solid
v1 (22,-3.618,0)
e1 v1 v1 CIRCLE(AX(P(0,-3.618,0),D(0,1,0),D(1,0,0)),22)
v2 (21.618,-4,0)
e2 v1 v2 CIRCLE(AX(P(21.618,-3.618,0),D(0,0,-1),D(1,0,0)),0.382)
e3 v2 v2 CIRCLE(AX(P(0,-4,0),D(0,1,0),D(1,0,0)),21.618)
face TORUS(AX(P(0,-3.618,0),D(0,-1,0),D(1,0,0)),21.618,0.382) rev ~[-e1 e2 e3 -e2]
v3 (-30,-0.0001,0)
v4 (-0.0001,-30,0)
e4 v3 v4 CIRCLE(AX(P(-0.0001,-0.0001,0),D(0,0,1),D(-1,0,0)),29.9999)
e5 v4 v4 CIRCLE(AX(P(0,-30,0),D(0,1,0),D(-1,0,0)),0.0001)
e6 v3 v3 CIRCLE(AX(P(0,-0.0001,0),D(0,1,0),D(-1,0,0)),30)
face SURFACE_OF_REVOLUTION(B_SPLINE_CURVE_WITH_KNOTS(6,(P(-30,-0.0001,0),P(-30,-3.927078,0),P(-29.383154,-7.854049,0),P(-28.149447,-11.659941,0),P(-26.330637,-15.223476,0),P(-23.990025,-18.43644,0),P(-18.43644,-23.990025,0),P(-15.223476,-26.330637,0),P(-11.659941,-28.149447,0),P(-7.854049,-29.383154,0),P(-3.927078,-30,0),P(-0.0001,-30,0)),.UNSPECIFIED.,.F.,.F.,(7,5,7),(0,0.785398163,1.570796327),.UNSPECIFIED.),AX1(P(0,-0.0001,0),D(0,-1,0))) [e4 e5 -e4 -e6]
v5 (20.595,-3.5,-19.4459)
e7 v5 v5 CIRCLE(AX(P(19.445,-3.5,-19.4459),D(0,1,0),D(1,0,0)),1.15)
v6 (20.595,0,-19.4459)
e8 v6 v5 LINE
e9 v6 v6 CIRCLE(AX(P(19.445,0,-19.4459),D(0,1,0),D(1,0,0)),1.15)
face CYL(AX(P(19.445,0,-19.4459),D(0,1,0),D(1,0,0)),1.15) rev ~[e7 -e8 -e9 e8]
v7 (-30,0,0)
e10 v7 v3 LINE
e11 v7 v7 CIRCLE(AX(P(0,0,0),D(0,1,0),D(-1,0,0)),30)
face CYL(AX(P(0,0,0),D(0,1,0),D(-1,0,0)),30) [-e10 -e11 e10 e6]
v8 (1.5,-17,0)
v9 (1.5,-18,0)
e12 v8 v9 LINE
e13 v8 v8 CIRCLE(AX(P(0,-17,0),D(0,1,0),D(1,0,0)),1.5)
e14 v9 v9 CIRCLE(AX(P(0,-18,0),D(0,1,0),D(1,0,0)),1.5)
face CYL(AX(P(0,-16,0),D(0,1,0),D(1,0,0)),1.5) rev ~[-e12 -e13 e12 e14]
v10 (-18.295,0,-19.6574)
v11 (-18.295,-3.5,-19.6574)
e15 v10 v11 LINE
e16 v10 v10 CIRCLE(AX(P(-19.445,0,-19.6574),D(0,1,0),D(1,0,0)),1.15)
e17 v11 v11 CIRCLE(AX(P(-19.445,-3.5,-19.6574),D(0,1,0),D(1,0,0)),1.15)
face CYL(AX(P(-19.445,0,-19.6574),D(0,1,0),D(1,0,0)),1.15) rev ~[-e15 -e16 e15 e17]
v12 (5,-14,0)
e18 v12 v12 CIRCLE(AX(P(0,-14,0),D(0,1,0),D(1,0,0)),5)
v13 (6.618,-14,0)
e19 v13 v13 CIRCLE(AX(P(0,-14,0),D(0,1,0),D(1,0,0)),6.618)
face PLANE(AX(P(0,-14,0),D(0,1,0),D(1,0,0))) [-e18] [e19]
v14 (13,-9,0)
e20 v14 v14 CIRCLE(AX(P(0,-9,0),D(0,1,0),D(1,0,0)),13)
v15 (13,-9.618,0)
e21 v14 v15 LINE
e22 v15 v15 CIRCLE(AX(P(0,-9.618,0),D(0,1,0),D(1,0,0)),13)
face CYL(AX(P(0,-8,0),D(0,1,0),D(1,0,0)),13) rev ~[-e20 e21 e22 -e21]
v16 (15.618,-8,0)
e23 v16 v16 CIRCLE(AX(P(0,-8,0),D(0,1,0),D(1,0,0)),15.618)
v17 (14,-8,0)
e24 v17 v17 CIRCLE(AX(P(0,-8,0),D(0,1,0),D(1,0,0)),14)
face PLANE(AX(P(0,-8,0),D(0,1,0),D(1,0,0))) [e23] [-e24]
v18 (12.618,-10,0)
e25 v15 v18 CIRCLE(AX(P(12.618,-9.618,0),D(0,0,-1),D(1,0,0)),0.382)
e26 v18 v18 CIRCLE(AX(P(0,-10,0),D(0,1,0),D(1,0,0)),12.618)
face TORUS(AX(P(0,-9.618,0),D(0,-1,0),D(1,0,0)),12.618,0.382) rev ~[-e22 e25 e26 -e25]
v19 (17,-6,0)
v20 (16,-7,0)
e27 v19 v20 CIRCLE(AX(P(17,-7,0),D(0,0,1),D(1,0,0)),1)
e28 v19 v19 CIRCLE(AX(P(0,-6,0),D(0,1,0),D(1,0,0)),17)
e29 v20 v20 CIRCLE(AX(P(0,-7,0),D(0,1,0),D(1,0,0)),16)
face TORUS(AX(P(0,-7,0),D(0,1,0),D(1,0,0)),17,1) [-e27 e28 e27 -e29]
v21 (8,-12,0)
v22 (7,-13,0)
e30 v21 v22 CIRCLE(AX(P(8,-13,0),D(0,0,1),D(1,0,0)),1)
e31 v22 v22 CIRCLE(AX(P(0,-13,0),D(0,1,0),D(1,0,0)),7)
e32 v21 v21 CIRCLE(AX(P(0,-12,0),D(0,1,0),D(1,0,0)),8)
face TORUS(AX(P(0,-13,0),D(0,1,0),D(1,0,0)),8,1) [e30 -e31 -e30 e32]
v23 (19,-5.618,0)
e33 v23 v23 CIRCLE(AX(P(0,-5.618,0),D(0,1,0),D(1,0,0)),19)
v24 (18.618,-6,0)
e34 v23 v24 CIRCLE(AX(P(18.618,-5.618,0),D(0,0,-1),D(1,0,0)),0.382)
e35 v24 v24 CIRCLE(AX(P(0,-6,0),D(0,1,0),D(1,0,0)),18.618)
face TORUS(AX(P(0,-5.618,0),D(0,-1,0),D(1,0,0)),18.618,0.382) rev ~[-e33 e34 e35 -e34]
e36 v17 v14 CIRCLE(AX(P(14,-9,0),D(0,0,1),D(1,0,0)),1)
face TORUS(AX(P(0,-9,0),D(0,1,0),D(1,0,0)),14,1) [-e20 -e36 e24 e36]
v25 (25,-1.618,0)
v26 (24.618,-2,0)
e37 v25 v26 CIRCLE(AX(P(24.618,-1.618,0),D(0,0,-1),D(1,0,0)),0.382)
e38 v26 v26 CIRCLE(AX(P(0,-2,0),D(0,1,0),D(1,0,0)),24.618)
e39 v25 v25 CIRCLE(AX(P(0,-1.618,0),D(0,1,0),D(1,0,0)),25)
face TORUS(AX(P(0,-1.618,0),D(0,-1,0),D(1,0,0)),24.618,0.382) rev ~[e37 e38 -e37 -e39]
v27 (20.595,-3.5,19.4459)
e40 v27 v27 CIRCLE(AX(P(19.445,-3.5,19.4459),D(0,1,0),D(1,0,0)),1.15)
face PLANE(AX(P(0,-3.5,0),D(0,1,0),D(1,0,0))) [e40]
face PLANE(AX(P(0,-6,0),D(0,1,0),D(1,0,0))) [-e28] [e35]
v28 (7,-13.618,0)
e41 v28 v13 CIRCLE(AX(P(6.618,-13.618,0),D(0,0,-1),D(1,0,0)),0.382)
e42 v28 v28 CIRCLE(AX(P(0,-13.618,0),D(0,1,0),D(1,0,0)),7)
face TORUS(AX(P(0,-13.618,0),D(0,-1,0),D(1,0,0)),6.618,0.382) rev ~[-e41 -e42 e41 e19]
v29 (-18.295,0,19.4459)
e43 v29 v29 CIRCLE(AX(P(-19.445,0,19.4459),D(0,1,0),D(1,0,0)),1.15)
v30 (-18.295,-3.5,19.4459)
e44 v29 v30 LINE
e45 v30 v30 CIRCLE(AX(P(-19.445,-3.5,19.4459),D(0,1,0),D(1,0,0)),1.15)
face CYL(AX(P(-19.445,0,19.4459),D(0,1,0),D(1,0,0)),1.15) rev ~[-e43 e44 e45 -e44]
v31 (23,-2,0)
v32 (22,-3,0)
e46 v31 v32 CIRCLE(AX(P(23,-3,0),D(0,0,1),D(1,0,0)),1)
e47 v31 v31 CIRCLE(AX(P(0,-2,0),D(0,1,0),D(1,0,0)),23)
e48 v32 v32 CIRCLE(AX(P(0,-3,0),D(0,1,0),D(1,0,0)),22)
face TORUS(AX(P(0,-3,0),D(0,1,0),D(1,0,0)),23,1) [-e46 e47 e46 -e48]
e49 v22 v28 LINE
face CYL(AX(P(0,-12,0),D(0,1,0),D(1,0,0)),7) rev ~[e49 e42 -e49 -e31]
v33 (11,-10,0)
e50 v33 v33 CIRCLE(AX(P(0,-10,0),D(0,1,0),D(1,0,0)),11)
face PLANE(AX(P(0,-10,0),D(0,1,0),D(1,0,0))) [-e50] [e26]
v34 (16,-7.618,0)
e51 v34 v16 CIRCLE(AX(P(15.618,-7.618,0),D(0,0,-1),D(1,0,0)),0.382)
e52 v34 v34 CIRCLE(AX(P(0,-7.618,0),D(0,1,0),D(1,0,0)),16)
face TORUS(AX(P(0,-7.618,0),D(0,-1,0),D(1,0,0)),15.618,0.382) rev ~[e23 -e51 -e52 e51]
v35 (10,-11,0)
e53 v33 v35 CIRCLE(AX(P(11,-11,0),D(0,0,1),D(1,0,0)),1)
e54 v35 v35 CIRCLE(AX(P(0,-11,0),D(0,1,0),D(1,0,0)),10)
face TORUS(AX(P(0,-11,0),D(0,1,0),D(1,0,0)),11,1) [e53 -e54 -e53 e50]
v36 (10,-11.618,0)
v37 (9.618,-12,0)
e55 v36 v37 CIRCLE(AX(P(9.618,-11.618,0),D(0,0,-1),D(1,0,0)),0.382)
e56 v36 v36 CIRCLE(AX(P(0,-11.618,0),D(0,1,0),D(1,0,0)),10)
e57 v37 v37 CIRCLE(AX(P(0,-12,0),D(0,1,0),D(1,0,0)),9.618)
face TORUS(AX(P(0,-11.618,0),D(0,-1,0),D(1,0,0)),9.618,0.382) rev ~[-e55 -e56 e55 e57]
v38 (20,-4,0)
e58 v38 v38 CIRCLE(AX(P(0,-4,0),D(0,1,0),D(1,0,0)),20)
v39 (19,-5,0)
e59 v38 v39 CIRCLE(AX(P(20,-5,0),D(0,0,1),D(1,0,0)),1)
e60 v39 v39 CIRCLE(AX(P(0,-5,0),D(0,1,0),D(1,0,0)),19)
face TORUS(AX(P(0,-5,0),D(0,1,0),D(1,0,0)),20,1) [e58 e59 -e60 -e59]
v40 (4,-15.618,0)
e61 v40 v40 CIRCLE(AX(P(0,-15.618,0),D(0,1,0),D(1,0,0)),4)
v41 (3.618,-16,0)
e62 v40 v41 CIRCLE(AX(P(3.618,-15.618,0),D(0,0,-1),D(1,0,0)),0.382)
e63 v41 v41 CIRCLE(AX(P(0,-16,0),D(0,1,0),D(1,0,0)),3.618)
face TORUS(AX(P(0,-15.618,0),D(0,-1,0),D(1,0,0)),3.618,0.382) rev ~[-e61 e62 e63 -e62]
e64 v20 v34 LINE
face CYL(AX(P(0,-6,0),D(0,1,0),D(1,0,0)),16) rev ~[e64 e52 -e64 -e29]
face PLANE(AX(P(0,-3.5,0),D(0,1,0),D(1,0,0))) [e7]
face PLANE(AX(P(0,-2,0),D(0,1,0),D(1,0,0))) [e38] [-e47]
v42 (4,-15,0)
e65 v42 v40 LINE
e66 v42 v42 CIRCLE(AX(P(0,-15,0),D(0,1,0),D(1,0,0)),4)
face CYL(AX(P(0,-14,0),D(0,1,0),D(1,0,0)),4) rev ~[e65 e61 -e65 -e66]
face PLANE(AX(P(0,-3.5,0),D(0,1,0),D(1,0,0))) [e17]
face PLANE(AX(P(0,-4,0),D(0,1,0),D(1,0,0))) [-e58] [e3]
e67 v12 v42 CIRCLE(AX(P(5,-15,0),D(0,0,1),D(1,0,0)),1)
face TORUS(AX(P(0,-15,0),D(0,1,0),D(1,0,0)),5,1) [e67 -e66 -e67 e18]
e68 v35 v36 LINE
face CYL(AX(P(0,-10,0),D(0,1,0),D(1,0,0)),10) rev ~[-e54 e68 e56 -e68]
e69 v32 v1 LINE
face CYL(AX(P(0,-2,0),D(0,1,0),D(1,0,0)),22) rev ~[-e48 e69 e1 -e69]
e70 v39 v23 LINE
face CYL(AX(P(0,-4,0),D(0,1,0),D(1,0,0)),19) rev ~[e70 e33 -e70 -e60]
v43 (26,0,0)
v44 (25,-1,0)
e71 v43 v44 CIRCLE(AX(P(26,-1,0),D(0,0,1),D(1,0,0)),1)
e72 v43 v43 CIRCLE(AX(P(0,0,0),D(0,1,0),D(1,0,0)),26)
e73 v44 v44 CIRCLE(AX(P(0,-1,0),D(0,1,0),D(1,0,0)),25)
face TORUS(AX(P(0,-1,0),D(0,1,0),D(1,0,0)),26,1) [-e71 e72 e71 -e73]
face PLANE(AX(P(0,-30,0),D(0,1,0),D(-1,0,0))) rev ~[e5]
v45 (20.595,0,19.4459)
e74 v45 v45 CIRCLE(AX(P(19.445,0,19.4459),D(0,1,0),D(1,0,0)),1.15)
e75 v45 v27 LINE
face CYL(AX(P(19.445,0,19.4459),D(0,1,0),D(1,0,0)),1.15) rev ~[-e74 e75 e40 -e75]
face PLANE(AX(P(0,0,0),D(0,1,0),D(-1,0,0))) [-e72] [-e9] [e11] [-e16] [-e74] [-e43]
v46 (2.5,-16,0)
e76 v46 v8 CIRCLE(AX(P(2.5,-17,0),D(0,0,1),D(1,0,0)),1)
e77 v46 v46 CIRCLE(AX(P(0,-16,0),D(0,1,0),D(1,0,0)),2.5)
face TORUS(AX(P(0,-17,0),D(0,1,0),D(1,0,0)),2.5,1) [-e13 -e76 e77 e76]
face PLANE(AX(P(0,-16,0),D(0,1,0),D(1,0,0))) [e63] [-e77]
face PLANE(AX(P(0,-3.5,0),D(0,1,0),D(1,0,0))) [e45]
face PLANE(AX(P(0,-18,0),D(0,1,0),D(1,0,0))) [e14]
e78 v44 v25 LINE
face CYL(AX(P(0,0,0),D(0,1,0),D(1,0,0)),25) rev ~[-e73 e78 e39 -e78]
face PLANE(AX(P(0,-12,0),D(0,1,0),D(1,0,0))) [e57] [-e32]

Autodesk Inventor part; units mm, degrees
ref_plane "YZ Plane" through (0, 0, 0) normal (1, 0, 0) x (0, 1, 0)
ref_plane "XZ Plane" through (0, 0, 0) normal (0, 1, 0) x (-1, 0, 0)
ref_plane "XY Plane" through (0, 0, 0) normal (0, 0, 1) x (1, 0, 0)
sketch "草圖3" plane through (0, 0, 0) normal (0, 1, 0) x (-1, 0, 0)
  circle A0 centre (0, 0) radius 30
  dimension "d1" = 60
extrude "擠出1" add sketch "草圖3" against normal blind 30
fillet "圓角1" radius 30 1 edges at (30, -30, 0)
sketch "草圖4" plane through (0, 0, 0) normal (0, 1, 0) x (1, 0, 0)
  circle A0 centre (0, 0) radius 25
  dimension "d6" = 50
extrude "擠出2" cut sketch "草圖4" against normal blind 2
sketch "草圖5" plane through (0, -2, 0) normal (0, 1, 0) x (1, 0, 0)
  circle A0 centre (0, 0) radius 22
  dimension "d9" = 44
extrude "擠出3" cut sketch "草圖5" against normal blind 2
sketch "草圖6" plane through (0, -4, 0) normal (0, 1, 0) x (1, 0, 0)
  circle A0 centre (0, 0) radius 19
  dimension "d12" = 38
extrude "擠出4" cut sketch "草圖6" against normal blind 2
sketch "草圖7" plane through (0, -6, 0) normal (0, 1, 0) x (1, 0, 0)
  circle A0 centre (0, 0) radius 16
  dimension "d15" = 32
extrude "擠出5" cut sketch "草圖7" against normal blind 2
sketch "草圖8" plane through (0, -8, 0) normal (0, 1, 0) x (1, 0, 0)
  circle A0 centre (0, 0) radius 13
  dimension "d18" = 26
extrude "擠出6" cut sketch "草圖8" against normal blind 2
sketch "草圖9" plane through (0, -10, 0) normal (0, 1, 0) x (1, 0, 0)
  circle A0 centre (0, 0) radius 10
  dimension "d21" = 20
extrude "擠出7" cut sketch "草圖9" against normal blind 2
sketch "草圖10" plane through (0, -12, 0) normal (0, 1, 0) x (1, 0, 0)
  circle A0 centre (0, 0) radius 7
  dimension "d24" = 14
extrude "擠出8" cut sketch "草圖10" against normal blind 2
sketch "草圖11" plane through (0, -14, 0) normal (0, 1, 0) x (1, 0, 0)
  circle A0 centre (0, 0) radius 4
  dimension "d27" = 8
extrude "擠出9" cut sketch "草圖11" against normal blind 2
sketch "草圖14" plane through (0, -16, 0) normal (0, 1, 0) x (1, 0, 0)
  circle A0 centre (0, 0) radius 7 projected
  circle A1 centre (0, 0) radius 1.5
  dimension "d33" = 3
extrude "擠出11" cut sketch "草圖14" against normal blind 2 contours A1
sketch "草圖15" plane through (0, 0, 0) normal (1, 0, 0) x (0, 1, 0)
  circle A0 centre (0, 0) radius 1.5
  dimension "d36" = 3
extrude "擠出12" [suppressed]
sketch "草圖16" plane through (0, 0, 0) normal (0, 0, 1) x (1, 0, 0)
  circle A0 centre (0, 0) radius 1.5
  dimension "d41" = 3
extrude "擠出13" [suppressed]
sketch "草圖25" plane through (0, 0, 0) normal (0, 0, 1) x (1, 0, 0)
  line L0 (0, 0) -> (24.7511, -24.7511)
  line L1 (30, 0) -> (30, 0) projected
  line L2 (0, 0) -> (25.9967, -23.4076)
  line L3 (24.7511, -24.7511) -> (25.9769, -23.3897)
  line L4 (0, 0) -> (23.4422, -26.0352)
  line L5 (23.4422, -26.0352) -> (24.7511, -24.7511)
  dimension "d63" = 45
  dimension "d64" = 3
  dimension "d69" = 42
  dimension "d70" = 48
extrude "擠出16" [suppressed]
fillet "圓角2" [suppressed]
sketch "草圖26" plane through (0, 0, 0) normal (0, 0, 1) x (1, 0, 0)
  line L0 (0, 0) -> (-28.2843, -28.2843)
  line L1 (0, 0) -> (-29.7258, -26.7652)
  line L2 (0, 0) -> (-26.7652, -29.7258)
  line L3 (30, 0) -> (30, 0) projected
  line L4 (-26.7652, -29.7258) -> (-28.2455, -28.2455)
  line L5 (-28.2455, -28.2455) -> (-29.7258, -26.7652)
  dimension "d72" = 45
  dimension "d73" = 48
  dimension "d74" = 42
  dimension "d75" = 40
  dimension "d76" = 40
  dimension "d77" = 40
extrude "擠出17" [suppressed]
fillet "圓角3" [suppressed]
sketch "草圖27" plane through (0, 0, 0) normal (1, 0, 0) x (0, 1, 0)
  arc A0 (0, 0) -> (0, 0) centre (0, 0) ccw projected
  line L0 (0, 0) -> (-28.2843, 28.2843)
  line L1 (0, 0) -> (0, 0) projected
  line L2 (0, 0) -> (-26.9265, 29.9049)
  line L3 (0, 0) -> (-29.7666, 26.802)
  line L4 (-29.7666, 26.802) -> (-28.2843, 28.2843)
  line L5 (-28.2843, 28.2843) -> (-26.802, 29.7666)
  line L6 (0, 0) -> (-28.2843, -28.2843)
  line L7 (0, 0) -> (0, 0) projected
  line L8 (0, 0) -> (-26.8123, -29.7781)
  line L9 (0, 0) -> (-29.8282, -26.8575)
  line L10 (-28.2843, -28.2843) -> (-26.8123, -29.7781)
  line L11 (-28.2843, -28.2843) -> (-29.8282, -26.8575)
  point P0 (-1.1147, 1.0037)
  point P1 (-1.0607, 1.0607)
  point P2 (-1.0037, -1.1147)
  point P3 (-1.1147, -1.0037)
  point P4 (-1.0037, 1.1147)
  dimension "d83" = 40
  dimension "d84" = 45
  dimension "d85" = 42
  dimension "d86" = 48
  dimension "d87" = 45
  dimension "d88" = 40
  dimension "d89" = 42
  dimension "d90" = 48
extrude "擠出18" [suppressed]
fillet "圓角4" [suppressed]
sketch "草圖29" plane through (0, 0, 0) normal (0, 1, 0) x (1, 0, 0)
  circle A0 centre (-19.445, 19.6574) radius 1.15
  arc A1 (25, 0) -> (25, 0) centre (0, 0) ccw projected
  arc A2 (30, 0) -> (30, 0) centre (0, 0) ccw projected
  circle A3 centre (19.445, 19.4459) radius 1.15
  arc A4 (30, 0) -> (30, 0) centre (0, 0) ccw projected
  arc A5 (25, 0) -> (25, 0) centre (0, 0) ccw projected
  circle A6 centre (-19.445, -19.4459) radius 1.15
  arc A7 (25, 0) -> (25, 0) centre (0, 0) ccw projected
  circle A8 centre (19.445, -19.4459) radius 1.15
  dimension "d97" = 2.3
  dimension "d99" = 1.2
  dimension "d100" = 19.445
  dimension "d102" = 27.65
  dimension "d104" = 2.3
  dimension "d105" = 27.5
  dimension "d106" = 19.445
  dimension "d107" = 1.35
  dimension "d109" = 1.35
  dimension "d110" = 1.5
  dimension "d111" = 2.3
  dimension "d112" = 27.5
  dimension "d113" = 19.445
  dimension "d114" = 19.4459
  dimension "d117" = 2.3
  dimension "d118" = 27.5
  dimension "d119" = 19.445
extrude "擠出19" cut sketch "草圖29" against normal blind 3.5 contours A0 | A3 | A6 | A8
fillet "圓角5" radius 1 9 edges at (-25, 0, 0) (-22, -2, 0) (-19, -4, 0) (-16, -6, 0) (-13, -8, 0) (-10, -10, 0) (-7, -12, 0) (-4, -14, 0) (-1.5, -16, 0)
fillet "面圓角1" radius 0.382 1 edges at (-25, -2, 0)
fillet "面圓角2" radius 0.382 1 edges at (-22, -4, 0)
fillet "面圓角3" radius 0.382 1 edges at (-19, -6, 0)
fillet "面圓角4" radius 0.382 1 edges at (-16, -8, 0)
fillet "面圓角5" radius 0.382 1 edges at (-13, -10, 0)
fillet "面圓角6" radius 0.382 1 edges at (-10, -12, 0)
fillet "面圓角7" radius 0.382 1 edges at (-7, -14, 0)
fillet "面圓角8" radius 0.382 1 edges at (-4, -16, 0)
sketch "草圖30" plane through (0, -18, 0) normal (0, 1, 0) x (1, 0, 0)
  circle A0 centre (0, 0) radius 1.25
  dimension "d131" = 2.5
extrude "擠出20" [suppressed]
feature "面圓角9" [suppressed]
fillet "圓角6" [suppressed]
properties part number "Energy_D"
